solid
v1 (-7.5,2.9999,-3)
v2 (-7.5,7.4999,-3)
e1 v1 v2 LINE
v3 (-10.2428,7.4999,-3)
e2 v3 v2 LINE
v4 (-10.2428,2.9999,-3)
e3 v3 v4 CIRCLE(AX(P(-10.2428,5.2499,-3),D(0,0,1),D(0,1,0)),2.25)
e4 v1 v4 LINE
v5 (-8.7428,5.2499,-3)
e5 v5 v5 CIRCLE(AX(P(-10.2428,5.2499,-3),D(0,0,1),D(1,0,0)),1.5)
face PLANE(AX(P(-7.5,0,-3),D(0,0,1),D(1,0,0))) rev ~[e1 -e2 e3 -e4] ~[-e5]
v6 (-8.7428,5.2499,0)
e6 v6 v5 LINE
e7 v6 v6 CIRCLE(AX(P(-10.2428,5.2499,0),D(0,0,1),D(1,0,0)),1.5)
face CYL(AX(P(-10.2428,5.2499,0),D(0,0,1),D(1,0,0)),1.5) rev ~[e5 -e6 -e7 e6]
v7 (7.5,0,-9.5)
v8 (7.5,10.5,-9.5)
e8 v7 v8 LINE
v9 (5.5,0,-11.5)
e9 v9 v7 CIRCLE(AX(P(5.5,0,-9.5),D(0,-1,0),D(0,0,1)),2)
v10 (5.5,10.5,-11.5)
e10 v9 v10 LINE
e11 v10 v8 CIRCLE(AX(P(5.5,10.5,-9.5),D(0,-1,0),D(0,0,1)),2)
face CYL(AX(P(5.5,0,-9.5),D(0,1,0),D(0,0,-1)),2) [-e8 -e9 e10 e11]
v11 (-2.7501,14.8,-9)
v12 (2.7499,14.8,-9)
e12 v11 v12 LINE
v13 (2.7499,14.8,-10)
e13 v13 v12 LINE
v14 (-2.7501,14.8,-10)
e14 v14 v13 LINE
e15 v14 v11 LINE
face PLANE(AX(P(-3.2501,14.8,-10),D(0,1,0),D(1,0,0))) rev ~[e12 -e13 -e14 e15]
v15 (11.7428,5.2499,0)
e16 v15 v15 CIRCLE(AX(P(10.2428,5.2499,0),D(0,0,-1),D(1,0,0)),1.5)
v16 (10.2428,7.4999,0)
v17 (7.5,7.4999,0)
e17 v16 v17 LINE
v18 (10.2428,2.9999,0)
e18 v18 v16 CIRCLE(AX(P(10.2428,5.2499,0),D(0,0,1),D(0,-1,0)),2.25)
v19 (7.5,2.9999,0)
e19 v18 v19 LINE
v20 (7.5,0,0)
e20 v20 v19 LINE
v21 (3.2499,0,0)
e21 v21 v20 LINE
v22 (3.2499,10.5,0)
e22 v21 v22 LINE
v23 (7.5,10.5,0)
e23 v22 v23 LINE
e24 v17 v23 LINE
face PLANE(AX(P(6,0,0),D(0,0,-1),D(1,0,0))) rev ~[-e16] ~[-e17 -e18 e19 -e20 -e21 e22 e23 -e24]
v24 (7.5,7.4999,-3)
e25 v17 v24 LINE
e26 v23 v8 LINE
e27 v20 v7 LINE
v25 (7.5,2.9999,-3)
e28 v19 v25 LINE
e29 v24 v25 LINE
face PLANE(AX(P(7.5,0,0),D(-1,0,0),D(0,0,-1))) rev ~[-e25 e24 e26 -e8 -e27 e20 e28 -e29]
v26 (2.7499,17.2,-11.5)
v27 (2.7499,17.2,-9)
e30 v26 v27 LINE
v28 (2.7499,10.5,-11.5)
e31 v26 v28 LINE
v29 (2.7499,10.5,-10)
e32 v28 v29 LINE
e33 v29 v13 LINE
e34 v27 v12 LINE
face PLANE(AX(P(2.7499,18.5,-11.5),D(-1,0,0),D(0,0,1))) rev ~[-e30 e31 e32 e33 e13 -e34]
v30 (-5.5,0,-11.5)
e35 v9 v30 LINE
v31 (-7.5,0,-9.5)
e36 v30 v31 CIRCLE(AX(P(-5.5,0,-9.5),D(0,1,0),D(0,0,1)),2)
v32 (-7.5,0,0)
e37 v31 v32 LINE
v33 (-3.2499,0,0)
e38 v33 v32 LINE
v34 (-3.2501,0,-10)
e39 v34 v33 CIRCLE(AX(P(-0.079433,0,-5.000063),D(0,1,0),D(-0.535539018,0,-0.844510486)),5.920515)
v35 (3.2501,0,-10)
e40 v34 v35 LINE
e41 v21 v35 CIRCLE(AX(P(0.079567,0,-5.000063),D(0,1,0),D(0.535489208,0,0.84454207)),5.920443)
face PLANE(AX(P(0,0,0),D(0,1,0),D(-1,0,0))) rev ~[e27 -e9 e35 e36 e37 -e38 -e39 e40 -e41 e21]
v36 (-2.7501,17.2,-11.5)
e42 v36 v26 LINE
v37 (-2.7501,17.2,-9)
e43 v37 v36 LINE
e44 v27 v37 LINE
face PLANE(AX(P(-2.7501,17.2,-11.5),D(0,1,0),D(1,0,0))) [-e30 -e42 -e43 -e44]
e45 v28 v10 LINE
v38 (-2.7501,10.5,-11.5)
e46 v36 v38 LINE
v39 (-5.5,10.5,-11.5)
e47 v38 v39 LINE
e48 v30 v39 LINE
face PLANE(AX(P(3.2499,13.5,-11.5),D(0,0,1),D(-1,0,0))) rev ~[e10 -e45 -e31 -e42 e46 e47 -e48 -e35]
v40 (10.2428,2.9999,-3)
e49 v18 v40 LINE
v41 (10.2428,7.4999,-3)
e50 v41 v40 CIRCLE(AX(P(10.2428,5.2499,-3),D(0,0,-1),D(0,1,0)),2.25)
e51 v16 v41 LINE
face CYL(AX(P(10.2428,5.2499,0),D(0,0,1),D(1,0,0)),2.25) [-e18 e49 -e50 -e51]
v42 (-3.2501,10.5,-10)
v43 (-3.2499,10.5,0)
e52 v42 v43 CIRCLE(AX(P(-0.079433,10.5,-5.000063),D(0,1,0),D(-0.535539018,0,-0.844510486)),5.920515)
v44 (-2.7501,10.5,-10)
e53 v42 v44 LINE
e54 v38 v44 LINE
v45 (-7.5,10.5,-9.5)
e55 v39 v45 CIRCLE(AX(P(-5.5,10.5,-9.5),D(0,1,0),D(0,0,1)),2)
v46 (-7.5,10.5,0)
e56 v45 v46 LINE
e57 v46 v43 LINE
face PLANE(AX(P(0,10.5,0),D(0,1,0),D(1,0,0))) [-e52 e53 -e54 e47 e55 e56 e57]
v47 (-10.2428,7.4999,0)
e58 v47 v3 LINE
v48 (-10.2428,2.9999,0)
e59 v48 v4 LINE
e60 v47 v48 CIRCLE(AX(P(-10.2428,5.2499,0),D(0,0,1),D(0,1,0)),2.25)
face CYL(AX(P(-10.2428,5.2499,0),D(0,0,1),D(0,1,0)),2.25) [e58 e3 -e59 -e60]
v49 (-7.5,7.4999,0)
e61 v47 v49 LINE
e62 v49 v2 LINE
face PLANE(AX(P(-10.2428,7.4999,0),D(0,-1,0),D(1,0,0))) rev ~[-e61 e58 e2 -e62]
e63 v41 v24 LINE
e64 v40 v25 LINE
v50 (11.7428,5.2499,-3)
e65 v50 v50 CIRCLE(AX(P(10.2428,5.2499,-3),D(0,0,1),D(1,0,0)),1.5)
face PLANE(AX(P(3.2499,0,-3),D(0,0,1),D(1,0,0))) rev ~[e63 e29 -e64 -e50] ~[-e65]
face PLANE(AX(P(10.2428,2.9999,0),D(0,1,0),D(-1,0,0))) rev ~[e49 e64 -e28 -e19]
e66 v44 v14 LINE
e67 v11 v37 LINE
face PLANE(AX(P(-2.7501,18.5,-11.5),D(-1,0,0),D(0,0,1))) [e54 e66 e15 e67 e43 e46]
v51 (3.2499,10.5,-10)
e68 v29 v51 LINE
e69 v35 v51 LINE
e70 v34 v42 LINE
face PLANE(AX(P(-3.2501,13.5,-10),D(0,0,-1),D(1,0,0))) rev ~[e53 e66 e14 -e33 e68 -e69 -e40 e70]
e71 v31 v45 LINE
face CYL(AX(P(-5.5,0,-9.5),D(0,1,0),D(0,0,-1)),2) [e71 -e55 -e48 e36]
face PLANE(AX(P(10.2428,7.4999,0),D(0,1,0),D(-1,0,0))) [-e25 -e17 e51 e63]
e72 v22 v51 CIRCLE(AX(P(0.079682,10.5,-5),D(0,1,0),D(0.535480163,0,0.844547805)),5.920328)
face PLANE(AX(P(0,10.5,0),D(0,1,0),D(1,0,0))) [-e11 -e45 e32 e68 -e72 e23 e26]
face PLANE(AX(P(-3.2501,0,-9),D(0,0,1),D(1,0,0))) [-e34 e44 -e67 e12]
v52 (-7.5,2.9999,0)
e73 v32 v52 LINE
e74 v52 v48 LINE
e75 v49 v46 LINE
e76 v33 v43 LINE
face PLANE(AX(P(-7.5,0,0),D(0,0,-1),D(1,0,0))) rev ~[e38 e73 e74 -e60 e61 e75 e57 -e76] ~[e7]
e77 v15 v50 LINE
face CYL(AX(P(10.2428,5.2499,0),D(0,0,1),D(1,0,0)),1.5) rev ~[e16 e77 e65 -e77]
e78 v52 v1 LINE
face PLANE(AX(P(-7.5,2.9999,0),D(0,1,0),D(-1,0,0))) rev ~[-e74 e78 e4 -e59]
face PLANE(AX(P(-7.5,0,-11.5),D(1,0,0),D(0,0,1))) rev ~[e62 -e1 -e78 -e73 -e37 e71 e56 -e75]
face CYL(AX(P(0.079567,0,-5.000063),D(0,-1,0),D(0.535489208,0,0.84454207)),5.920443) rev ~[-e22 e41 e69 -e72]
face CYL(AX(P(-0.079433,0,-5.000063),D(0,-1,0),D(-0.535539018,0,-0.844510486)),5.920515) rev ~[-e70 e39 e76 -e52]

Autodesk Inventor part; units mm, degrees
ref_plane "YZ Plane" through (0, 0, 0) normal (1, 0, 0) x (0, 1, 0)
sketch "Esboço1" plane through (0, 0, 0) normal (0, 1, 0) x (-1, 0, 0)
  line L0 (-7.5, 0) -> (-7.5, -11.5)
  line L1 (-7.5, -11.5) -> (7.5, -11.5)
  line L2 (7.5, -11.5) -> (7.5, 0)
  line L3 (-6, -10) -> (-6, 0)
  line L4 (6, 0) -> (6, -10)
  line L5 (6, -10) -> (-6, -10)
  line L6 (7.5, 0) -> (6, 0)
  line L7 (-6, 0) -> (-7.5, 0)
  arc A0 (-3.2499, 0) -> (-3.2501, -10) centre (-0.0795, -5.0001) ccw
  line L8 (-3.2501, -10) -> (3.2501, -10)
  arc A1 (3.2501, -10) -> (3.2499, 0) centre (0.0795, -5.0001) ccw
  line L9 (3.2499, 0) -> (-3.2499, 0)
  line L10 (6, -10) -> (-6, -10)
  line L11 (-6, -10) -> (-6, 0)
  line L12 (-6, 0) -> (6, 0)
  line L13 (6, 0) -> (6, -10)
  point P0 (0, 0)
  point P1 (-3.2499, 0)
  dimension "d0" = 15
  dimension "d1" = 11.5
  dimension "d2" = 1.5
  dimension "d3" = 11.5
extrude "Extrusão1" add sketch "Esboço1" along normal blind 13.5 contours L7 L3 L5 L4 L6 L2 L1 L0 | L12 A0 L3 | A0 L5 L3 | L12 L4 A1 | A1 L4 L5
sketch "Esboço2" plane through (0, 13.5, 0) normal (0, 1, 0) x (1, 0, 0)
  line L0 (-3.2501, 10) -> (3.2501, 10) projected
  line L1 (7.5, 11.5) -> (-7.5, 11.5) projected
  line L2 (-3.2501, 10) -> (3.2499, 10)
  line L3 (3.2499, 10) -> (3.2499, 11.5)
  line L4 (3.2499, 11.5) -> (-3.2501, 11.5)
  line L5 (-3.2501, 11.5) -> (-3.2501, 10)
  point P0 (0, 0)
  dimension "d8" = 6.5
extrude "Extrusão2" add sketch "Esboço2" along normal blind 5
sketch "Esboço3" plane through (-3.2501, 0, -10) normal (0, 0, 1) x (1, 0, 0)
  line L0 (0, 13.5) -> (0, 18.5) projected
  line L1 (6.5, 13.5) -> (6.5, 18.5) projected
  line L2 (0, 14.8) -> (6.5, 14.8)
  line L3 (6.5, 14.8) -> (6.5, 15.3)
  line L4 (6.5, 15.3) -> (0, 15.3)
  line L5 (0, 15.3) -> (0, 14.8)
  line L6 (6.5, 18.5) -> (0, 18.5) projected
  line L7 (0, 18.5) -> (6.5, 18.5)
  line L8 (6.5, 18.5) -> (6.5, 18)
  line L9 (6.5, 18) -> (0, 18)
  line L10 (0, 18) -> (0, 18.5)
  line L11 (0, 17.2) -> (6.5, 17.2)
  line L12 (6.5, 17.2) -> (6.5, 16.7)
  line L13 (6.5, 16.7) -> (0, 16.7)
  line L14 (0, 16.7) -> (0, 17.2)
  point P0 (3.2501, 0)
  point P1 (0, 15.3)
  point P2 (6.5, 14.8)
  point P3 (0, 16.7)
  point P4 (6.5, 17.2)
  dimension "d11" = 0.5
  dimension "d12" = 0.5
  dimension "d13" = 0.5
extrude "Extrusão3" add sketch "Esboço3" along normal blind 1 contours L0 L4 L1 L2 | L0 L6 L1 L9
extrude "Extrusão4" add sketch "Esboço3" along normal blind 0.5 contours L0 L11 L1 L13
sketch "Esboço4" plane through (0, 13.5, 0) normal (0, 1, 0) x (1, 0, 0)
  line L0 (-3.2501, 10) -> (-3.2501, 11.5) projected
  line L1 (-3.2501, 11.5) -> (-7.5, 11.5) projected
  line L2 (-7.5, 11.5) -> (-7.5, 0) projected
  line L3 (-7.5, 0) -> (-3.2499, 0) projected
  arc A0 (-3.2501, 10) -> (-3.2499, 0) centre (-0.0795, 5.0001) ccw projected
  line L4 (3.2499, 11.5) -> (3.2499, 10) projected
  line L5 (3.2499, 10) -> (3.2501, 10) projected
  arc A1 (3.2499, 0) -> (3.2501, 10) centre (0.0795, 5.0001) ccw projected
  line L6 (3.2499, 0) -> (7.5, 0) projected
  line L7 (7.5, 0) -> (7.5, 11.5) projected
  line L8 (7.5, 11.5) -> (3.2499, 11.5) projected
  line L9 (-3.2501, 9) -> (3.2499, 9) projected
  line L10 (-3.2501, 11.5) -> (-2.7501, 11.5)
  line L11 (-2.7501, 11.5) -> (-2.7501, 9)
  line L12 (-2.7501, 9) -> (-3.2501, 9)
  line L13 (-3.2501, 9) -> (-3.2501, 11.5)
  line L14 (3.2499, 11.5) -> (2.7499, 11.5)
  line L15 (2.7499, 11.5) -> (2.7499, 9)
  line L16 (2.7499, 9) -> (3.2499, 9)
  line L17 (3.2499, 9) -> (3.2499, 11.5)
  point P0 (0, 0)
  dimension "d20" = 0.5
  dimension "d21" = 0.5
extrude "Extrusão5" cut sketch "Esboço4" against normal blind 3 contours A0 L3 L2 L1 L0 | L8 L7 L6 A1 L4
sketch "Esboço5" plane through (0, 18.5, 0) normal (0, 1, 0) x (1, 0, 0)
  line L0 (-7.5, 11.5) -> (-3.2501, 11.5) projected
  line L1 (-3.2501, 9) -> (3.2499, 9) projected
  line L2 (-3.2501, 11.5) -> (-2.7501, 11.5)
  line L3 (-2.7501, 11.5) -> (-2.7501, 9)
  line L4 (-2.7501, 9) -> (-3.2501, 9)
  line L5 (-3.2501, 9) -> (-3.2501, 11.5)
  line L6 (3.2499, 11.5) -> (3.2499, 9) projected
  line L7 (3.2499, 11.5) -> (2.7499, 11.5)
  line L8 (2.7499, 11.5) -> (2.7499, 9)
  line L9 (2.7499, 9) -> (3.2499, 9)
  line L10 (3.2499, 9) -> (3.2499, 11.5)
  point P0 (0, 0)
  dimension "d22" = 0.5
  dimension "d23" = 0.5
extrude "Extrusão6" cut sketch "Esboço5" against normal up to surface (8 mm away)
sketch "Esboço6" plane through (3.2499, 0, 0) normal (0, 0, 1) x (1, 0, 0)
  point P0 (-3.2499, 0)
ref_plane "Plano de trabalho1" through (3.2499, 0, 0) normal (0, 0, 1) x (1, 0, 0)
sketch "Esboço7" plane through (3.2499, 0, 0) normal (0, 0, 1) x (1, 0, 0)
  line L0 (4.2501, 0) -> (4.2501, 10.5) projected
  line L1 (4.2501, 10.5) -> (4.2501, 0)
  circle A0 centre (6.9929, 5.2499) radius 1.5
  circle A1 centre (6.9929, 5.2499) radius 2.25
  line L2 (6.9929, 7.4999) -> (4.2501, 7.4999)
  line L3 (6.9929, 2.9999) -> (4.2501, 2.9999)
  line L4 (4.2501, 5.2499) -> (4.7429, 5.2499)
  line L5 (5.4929, 5.2499) -> (9.7501, 5.2499)
  point P0 (-3.2499, 0)
  dimension "d28" = 3
  dimension "d29" = 4.5
extrude "Extrusão7" add sketch "Esboço7" against normal blind 3
ref_plane "Plano de trabalho2" through (-7.5, 0, 0) normal (0, 0, 1) x (1, 0, 0)
sketch "Esboço8" plane through (-7.5, 0, 0) normal (0, 0, 1) x (1, 0, 0)
  circle A0 centre (17.7428, 5.2499) radius 1.5
  line L0 (15, 10.5) -> (10.7499, 10.5) projected
  line L1 (10.7499, 0) -> (10.7499, 10.5) projected
  line L2 (10.7499, 0) -> (15, 0) projected
  line L3 (15, 0) -> (15, 2.9999) projected
  line L4 (15, 2.9999) -> (17.7428, 2.9999) projected
  arc A1 (17.7428, 2.9999) -> (17.7428, 7.4999) centre (17.7428, 5.2499) ccw projected
  line L5 (17.7428, 7.4999) -> (15, 7.4999) projected
  line L6 (15, 7.4999) -> (15, 10.5) projected
  circle A2 centre (-2.7428, 5.2499) radius 1.5
  line L7 (0, 0) -> (0, 2.9999)
  line L8 (0, 2.9999) -> (-2.7428, 2.9999)
  arc A3 (-2.7428, 7.4999) -> (-2.7428, 2.9999) centre (-2.7428, 5.2499) ccw
  line L9 (-2.7428, 7.4999) -> (0, 7.4999)
  line L10 (0, 7.4999) -> (0, 10.5)
  line L11 (0, 0) -> (0, 10.5) projected
  line L12 (0, 10.5) -> (0, 0)
  point P0 (7.5, 0)
extrude "Extrusão8" add sketch "Esboço8" against normal blind 3 contours L8 A3 L9 L11
sketch "Esboço9" plane through (7.5, 0, -11.5) normal (0, 0, -1) x (-1, 0, 0)
  line L0 (10.2501, 18) -> (10.2501, 17.2) projected
  line L1 (10.2501, 17.2) -> (4.7501, 17.2) projected
  line L2 (4.7501, 17.2) -> (4.7501, 18) projected
  line L3 (4.7501, 18) -> (10.2501, 18) projected
  line L4 (10.2501, 18.5) -> (10.2501, 18) projected
  line L5 (10.2501, 18) -> (4.7501, 18) projected
  line L6 (4.7501, 18) -> (4.7501, 18.5) projected
  line L7 (4.7501, 18.5) -> (10.2501, 18.5) projected
  point P0 (7.5, 0)
extrude "Extrusão9" cut sketch "Esboço9" against normal blind 10
sketch "Esboço10" plane through (-2.7501, 15.3, -10) normal (0, 0, 1) x (1, 0, 0)
  line L0 (0, 1.4) -> (0, 0) projected
  line L1 (0, 0) -> (5.5, 0) projected
  line L2 (5.5, 0) -> (5.5, 1.4) projected
  line L3 (5.5, 1.4) -> (0, 1.4) projected
  line L4 (0, 1.9) -> (0, 1.4) projected
  line L5 (0, 1.4) -> (5.5, 1.4) projected
  line L6 (5.5, 1.4) -> (5.5, 1.9) projected
  line L7 (5.5, 1.9) -> (0, 1.9) projected
  point P0 (2.7501, -15.3)
extrude "Extrusão10" add sketch "Esboço10" along normal up to surface (1 mm away)
fillet "Arredondamento1" radius 2 2 edges at (7.5, 5.25, -11.5) (-7.5, 5.25, -11.5)
properties part number "Suporte Externo - Motor"
